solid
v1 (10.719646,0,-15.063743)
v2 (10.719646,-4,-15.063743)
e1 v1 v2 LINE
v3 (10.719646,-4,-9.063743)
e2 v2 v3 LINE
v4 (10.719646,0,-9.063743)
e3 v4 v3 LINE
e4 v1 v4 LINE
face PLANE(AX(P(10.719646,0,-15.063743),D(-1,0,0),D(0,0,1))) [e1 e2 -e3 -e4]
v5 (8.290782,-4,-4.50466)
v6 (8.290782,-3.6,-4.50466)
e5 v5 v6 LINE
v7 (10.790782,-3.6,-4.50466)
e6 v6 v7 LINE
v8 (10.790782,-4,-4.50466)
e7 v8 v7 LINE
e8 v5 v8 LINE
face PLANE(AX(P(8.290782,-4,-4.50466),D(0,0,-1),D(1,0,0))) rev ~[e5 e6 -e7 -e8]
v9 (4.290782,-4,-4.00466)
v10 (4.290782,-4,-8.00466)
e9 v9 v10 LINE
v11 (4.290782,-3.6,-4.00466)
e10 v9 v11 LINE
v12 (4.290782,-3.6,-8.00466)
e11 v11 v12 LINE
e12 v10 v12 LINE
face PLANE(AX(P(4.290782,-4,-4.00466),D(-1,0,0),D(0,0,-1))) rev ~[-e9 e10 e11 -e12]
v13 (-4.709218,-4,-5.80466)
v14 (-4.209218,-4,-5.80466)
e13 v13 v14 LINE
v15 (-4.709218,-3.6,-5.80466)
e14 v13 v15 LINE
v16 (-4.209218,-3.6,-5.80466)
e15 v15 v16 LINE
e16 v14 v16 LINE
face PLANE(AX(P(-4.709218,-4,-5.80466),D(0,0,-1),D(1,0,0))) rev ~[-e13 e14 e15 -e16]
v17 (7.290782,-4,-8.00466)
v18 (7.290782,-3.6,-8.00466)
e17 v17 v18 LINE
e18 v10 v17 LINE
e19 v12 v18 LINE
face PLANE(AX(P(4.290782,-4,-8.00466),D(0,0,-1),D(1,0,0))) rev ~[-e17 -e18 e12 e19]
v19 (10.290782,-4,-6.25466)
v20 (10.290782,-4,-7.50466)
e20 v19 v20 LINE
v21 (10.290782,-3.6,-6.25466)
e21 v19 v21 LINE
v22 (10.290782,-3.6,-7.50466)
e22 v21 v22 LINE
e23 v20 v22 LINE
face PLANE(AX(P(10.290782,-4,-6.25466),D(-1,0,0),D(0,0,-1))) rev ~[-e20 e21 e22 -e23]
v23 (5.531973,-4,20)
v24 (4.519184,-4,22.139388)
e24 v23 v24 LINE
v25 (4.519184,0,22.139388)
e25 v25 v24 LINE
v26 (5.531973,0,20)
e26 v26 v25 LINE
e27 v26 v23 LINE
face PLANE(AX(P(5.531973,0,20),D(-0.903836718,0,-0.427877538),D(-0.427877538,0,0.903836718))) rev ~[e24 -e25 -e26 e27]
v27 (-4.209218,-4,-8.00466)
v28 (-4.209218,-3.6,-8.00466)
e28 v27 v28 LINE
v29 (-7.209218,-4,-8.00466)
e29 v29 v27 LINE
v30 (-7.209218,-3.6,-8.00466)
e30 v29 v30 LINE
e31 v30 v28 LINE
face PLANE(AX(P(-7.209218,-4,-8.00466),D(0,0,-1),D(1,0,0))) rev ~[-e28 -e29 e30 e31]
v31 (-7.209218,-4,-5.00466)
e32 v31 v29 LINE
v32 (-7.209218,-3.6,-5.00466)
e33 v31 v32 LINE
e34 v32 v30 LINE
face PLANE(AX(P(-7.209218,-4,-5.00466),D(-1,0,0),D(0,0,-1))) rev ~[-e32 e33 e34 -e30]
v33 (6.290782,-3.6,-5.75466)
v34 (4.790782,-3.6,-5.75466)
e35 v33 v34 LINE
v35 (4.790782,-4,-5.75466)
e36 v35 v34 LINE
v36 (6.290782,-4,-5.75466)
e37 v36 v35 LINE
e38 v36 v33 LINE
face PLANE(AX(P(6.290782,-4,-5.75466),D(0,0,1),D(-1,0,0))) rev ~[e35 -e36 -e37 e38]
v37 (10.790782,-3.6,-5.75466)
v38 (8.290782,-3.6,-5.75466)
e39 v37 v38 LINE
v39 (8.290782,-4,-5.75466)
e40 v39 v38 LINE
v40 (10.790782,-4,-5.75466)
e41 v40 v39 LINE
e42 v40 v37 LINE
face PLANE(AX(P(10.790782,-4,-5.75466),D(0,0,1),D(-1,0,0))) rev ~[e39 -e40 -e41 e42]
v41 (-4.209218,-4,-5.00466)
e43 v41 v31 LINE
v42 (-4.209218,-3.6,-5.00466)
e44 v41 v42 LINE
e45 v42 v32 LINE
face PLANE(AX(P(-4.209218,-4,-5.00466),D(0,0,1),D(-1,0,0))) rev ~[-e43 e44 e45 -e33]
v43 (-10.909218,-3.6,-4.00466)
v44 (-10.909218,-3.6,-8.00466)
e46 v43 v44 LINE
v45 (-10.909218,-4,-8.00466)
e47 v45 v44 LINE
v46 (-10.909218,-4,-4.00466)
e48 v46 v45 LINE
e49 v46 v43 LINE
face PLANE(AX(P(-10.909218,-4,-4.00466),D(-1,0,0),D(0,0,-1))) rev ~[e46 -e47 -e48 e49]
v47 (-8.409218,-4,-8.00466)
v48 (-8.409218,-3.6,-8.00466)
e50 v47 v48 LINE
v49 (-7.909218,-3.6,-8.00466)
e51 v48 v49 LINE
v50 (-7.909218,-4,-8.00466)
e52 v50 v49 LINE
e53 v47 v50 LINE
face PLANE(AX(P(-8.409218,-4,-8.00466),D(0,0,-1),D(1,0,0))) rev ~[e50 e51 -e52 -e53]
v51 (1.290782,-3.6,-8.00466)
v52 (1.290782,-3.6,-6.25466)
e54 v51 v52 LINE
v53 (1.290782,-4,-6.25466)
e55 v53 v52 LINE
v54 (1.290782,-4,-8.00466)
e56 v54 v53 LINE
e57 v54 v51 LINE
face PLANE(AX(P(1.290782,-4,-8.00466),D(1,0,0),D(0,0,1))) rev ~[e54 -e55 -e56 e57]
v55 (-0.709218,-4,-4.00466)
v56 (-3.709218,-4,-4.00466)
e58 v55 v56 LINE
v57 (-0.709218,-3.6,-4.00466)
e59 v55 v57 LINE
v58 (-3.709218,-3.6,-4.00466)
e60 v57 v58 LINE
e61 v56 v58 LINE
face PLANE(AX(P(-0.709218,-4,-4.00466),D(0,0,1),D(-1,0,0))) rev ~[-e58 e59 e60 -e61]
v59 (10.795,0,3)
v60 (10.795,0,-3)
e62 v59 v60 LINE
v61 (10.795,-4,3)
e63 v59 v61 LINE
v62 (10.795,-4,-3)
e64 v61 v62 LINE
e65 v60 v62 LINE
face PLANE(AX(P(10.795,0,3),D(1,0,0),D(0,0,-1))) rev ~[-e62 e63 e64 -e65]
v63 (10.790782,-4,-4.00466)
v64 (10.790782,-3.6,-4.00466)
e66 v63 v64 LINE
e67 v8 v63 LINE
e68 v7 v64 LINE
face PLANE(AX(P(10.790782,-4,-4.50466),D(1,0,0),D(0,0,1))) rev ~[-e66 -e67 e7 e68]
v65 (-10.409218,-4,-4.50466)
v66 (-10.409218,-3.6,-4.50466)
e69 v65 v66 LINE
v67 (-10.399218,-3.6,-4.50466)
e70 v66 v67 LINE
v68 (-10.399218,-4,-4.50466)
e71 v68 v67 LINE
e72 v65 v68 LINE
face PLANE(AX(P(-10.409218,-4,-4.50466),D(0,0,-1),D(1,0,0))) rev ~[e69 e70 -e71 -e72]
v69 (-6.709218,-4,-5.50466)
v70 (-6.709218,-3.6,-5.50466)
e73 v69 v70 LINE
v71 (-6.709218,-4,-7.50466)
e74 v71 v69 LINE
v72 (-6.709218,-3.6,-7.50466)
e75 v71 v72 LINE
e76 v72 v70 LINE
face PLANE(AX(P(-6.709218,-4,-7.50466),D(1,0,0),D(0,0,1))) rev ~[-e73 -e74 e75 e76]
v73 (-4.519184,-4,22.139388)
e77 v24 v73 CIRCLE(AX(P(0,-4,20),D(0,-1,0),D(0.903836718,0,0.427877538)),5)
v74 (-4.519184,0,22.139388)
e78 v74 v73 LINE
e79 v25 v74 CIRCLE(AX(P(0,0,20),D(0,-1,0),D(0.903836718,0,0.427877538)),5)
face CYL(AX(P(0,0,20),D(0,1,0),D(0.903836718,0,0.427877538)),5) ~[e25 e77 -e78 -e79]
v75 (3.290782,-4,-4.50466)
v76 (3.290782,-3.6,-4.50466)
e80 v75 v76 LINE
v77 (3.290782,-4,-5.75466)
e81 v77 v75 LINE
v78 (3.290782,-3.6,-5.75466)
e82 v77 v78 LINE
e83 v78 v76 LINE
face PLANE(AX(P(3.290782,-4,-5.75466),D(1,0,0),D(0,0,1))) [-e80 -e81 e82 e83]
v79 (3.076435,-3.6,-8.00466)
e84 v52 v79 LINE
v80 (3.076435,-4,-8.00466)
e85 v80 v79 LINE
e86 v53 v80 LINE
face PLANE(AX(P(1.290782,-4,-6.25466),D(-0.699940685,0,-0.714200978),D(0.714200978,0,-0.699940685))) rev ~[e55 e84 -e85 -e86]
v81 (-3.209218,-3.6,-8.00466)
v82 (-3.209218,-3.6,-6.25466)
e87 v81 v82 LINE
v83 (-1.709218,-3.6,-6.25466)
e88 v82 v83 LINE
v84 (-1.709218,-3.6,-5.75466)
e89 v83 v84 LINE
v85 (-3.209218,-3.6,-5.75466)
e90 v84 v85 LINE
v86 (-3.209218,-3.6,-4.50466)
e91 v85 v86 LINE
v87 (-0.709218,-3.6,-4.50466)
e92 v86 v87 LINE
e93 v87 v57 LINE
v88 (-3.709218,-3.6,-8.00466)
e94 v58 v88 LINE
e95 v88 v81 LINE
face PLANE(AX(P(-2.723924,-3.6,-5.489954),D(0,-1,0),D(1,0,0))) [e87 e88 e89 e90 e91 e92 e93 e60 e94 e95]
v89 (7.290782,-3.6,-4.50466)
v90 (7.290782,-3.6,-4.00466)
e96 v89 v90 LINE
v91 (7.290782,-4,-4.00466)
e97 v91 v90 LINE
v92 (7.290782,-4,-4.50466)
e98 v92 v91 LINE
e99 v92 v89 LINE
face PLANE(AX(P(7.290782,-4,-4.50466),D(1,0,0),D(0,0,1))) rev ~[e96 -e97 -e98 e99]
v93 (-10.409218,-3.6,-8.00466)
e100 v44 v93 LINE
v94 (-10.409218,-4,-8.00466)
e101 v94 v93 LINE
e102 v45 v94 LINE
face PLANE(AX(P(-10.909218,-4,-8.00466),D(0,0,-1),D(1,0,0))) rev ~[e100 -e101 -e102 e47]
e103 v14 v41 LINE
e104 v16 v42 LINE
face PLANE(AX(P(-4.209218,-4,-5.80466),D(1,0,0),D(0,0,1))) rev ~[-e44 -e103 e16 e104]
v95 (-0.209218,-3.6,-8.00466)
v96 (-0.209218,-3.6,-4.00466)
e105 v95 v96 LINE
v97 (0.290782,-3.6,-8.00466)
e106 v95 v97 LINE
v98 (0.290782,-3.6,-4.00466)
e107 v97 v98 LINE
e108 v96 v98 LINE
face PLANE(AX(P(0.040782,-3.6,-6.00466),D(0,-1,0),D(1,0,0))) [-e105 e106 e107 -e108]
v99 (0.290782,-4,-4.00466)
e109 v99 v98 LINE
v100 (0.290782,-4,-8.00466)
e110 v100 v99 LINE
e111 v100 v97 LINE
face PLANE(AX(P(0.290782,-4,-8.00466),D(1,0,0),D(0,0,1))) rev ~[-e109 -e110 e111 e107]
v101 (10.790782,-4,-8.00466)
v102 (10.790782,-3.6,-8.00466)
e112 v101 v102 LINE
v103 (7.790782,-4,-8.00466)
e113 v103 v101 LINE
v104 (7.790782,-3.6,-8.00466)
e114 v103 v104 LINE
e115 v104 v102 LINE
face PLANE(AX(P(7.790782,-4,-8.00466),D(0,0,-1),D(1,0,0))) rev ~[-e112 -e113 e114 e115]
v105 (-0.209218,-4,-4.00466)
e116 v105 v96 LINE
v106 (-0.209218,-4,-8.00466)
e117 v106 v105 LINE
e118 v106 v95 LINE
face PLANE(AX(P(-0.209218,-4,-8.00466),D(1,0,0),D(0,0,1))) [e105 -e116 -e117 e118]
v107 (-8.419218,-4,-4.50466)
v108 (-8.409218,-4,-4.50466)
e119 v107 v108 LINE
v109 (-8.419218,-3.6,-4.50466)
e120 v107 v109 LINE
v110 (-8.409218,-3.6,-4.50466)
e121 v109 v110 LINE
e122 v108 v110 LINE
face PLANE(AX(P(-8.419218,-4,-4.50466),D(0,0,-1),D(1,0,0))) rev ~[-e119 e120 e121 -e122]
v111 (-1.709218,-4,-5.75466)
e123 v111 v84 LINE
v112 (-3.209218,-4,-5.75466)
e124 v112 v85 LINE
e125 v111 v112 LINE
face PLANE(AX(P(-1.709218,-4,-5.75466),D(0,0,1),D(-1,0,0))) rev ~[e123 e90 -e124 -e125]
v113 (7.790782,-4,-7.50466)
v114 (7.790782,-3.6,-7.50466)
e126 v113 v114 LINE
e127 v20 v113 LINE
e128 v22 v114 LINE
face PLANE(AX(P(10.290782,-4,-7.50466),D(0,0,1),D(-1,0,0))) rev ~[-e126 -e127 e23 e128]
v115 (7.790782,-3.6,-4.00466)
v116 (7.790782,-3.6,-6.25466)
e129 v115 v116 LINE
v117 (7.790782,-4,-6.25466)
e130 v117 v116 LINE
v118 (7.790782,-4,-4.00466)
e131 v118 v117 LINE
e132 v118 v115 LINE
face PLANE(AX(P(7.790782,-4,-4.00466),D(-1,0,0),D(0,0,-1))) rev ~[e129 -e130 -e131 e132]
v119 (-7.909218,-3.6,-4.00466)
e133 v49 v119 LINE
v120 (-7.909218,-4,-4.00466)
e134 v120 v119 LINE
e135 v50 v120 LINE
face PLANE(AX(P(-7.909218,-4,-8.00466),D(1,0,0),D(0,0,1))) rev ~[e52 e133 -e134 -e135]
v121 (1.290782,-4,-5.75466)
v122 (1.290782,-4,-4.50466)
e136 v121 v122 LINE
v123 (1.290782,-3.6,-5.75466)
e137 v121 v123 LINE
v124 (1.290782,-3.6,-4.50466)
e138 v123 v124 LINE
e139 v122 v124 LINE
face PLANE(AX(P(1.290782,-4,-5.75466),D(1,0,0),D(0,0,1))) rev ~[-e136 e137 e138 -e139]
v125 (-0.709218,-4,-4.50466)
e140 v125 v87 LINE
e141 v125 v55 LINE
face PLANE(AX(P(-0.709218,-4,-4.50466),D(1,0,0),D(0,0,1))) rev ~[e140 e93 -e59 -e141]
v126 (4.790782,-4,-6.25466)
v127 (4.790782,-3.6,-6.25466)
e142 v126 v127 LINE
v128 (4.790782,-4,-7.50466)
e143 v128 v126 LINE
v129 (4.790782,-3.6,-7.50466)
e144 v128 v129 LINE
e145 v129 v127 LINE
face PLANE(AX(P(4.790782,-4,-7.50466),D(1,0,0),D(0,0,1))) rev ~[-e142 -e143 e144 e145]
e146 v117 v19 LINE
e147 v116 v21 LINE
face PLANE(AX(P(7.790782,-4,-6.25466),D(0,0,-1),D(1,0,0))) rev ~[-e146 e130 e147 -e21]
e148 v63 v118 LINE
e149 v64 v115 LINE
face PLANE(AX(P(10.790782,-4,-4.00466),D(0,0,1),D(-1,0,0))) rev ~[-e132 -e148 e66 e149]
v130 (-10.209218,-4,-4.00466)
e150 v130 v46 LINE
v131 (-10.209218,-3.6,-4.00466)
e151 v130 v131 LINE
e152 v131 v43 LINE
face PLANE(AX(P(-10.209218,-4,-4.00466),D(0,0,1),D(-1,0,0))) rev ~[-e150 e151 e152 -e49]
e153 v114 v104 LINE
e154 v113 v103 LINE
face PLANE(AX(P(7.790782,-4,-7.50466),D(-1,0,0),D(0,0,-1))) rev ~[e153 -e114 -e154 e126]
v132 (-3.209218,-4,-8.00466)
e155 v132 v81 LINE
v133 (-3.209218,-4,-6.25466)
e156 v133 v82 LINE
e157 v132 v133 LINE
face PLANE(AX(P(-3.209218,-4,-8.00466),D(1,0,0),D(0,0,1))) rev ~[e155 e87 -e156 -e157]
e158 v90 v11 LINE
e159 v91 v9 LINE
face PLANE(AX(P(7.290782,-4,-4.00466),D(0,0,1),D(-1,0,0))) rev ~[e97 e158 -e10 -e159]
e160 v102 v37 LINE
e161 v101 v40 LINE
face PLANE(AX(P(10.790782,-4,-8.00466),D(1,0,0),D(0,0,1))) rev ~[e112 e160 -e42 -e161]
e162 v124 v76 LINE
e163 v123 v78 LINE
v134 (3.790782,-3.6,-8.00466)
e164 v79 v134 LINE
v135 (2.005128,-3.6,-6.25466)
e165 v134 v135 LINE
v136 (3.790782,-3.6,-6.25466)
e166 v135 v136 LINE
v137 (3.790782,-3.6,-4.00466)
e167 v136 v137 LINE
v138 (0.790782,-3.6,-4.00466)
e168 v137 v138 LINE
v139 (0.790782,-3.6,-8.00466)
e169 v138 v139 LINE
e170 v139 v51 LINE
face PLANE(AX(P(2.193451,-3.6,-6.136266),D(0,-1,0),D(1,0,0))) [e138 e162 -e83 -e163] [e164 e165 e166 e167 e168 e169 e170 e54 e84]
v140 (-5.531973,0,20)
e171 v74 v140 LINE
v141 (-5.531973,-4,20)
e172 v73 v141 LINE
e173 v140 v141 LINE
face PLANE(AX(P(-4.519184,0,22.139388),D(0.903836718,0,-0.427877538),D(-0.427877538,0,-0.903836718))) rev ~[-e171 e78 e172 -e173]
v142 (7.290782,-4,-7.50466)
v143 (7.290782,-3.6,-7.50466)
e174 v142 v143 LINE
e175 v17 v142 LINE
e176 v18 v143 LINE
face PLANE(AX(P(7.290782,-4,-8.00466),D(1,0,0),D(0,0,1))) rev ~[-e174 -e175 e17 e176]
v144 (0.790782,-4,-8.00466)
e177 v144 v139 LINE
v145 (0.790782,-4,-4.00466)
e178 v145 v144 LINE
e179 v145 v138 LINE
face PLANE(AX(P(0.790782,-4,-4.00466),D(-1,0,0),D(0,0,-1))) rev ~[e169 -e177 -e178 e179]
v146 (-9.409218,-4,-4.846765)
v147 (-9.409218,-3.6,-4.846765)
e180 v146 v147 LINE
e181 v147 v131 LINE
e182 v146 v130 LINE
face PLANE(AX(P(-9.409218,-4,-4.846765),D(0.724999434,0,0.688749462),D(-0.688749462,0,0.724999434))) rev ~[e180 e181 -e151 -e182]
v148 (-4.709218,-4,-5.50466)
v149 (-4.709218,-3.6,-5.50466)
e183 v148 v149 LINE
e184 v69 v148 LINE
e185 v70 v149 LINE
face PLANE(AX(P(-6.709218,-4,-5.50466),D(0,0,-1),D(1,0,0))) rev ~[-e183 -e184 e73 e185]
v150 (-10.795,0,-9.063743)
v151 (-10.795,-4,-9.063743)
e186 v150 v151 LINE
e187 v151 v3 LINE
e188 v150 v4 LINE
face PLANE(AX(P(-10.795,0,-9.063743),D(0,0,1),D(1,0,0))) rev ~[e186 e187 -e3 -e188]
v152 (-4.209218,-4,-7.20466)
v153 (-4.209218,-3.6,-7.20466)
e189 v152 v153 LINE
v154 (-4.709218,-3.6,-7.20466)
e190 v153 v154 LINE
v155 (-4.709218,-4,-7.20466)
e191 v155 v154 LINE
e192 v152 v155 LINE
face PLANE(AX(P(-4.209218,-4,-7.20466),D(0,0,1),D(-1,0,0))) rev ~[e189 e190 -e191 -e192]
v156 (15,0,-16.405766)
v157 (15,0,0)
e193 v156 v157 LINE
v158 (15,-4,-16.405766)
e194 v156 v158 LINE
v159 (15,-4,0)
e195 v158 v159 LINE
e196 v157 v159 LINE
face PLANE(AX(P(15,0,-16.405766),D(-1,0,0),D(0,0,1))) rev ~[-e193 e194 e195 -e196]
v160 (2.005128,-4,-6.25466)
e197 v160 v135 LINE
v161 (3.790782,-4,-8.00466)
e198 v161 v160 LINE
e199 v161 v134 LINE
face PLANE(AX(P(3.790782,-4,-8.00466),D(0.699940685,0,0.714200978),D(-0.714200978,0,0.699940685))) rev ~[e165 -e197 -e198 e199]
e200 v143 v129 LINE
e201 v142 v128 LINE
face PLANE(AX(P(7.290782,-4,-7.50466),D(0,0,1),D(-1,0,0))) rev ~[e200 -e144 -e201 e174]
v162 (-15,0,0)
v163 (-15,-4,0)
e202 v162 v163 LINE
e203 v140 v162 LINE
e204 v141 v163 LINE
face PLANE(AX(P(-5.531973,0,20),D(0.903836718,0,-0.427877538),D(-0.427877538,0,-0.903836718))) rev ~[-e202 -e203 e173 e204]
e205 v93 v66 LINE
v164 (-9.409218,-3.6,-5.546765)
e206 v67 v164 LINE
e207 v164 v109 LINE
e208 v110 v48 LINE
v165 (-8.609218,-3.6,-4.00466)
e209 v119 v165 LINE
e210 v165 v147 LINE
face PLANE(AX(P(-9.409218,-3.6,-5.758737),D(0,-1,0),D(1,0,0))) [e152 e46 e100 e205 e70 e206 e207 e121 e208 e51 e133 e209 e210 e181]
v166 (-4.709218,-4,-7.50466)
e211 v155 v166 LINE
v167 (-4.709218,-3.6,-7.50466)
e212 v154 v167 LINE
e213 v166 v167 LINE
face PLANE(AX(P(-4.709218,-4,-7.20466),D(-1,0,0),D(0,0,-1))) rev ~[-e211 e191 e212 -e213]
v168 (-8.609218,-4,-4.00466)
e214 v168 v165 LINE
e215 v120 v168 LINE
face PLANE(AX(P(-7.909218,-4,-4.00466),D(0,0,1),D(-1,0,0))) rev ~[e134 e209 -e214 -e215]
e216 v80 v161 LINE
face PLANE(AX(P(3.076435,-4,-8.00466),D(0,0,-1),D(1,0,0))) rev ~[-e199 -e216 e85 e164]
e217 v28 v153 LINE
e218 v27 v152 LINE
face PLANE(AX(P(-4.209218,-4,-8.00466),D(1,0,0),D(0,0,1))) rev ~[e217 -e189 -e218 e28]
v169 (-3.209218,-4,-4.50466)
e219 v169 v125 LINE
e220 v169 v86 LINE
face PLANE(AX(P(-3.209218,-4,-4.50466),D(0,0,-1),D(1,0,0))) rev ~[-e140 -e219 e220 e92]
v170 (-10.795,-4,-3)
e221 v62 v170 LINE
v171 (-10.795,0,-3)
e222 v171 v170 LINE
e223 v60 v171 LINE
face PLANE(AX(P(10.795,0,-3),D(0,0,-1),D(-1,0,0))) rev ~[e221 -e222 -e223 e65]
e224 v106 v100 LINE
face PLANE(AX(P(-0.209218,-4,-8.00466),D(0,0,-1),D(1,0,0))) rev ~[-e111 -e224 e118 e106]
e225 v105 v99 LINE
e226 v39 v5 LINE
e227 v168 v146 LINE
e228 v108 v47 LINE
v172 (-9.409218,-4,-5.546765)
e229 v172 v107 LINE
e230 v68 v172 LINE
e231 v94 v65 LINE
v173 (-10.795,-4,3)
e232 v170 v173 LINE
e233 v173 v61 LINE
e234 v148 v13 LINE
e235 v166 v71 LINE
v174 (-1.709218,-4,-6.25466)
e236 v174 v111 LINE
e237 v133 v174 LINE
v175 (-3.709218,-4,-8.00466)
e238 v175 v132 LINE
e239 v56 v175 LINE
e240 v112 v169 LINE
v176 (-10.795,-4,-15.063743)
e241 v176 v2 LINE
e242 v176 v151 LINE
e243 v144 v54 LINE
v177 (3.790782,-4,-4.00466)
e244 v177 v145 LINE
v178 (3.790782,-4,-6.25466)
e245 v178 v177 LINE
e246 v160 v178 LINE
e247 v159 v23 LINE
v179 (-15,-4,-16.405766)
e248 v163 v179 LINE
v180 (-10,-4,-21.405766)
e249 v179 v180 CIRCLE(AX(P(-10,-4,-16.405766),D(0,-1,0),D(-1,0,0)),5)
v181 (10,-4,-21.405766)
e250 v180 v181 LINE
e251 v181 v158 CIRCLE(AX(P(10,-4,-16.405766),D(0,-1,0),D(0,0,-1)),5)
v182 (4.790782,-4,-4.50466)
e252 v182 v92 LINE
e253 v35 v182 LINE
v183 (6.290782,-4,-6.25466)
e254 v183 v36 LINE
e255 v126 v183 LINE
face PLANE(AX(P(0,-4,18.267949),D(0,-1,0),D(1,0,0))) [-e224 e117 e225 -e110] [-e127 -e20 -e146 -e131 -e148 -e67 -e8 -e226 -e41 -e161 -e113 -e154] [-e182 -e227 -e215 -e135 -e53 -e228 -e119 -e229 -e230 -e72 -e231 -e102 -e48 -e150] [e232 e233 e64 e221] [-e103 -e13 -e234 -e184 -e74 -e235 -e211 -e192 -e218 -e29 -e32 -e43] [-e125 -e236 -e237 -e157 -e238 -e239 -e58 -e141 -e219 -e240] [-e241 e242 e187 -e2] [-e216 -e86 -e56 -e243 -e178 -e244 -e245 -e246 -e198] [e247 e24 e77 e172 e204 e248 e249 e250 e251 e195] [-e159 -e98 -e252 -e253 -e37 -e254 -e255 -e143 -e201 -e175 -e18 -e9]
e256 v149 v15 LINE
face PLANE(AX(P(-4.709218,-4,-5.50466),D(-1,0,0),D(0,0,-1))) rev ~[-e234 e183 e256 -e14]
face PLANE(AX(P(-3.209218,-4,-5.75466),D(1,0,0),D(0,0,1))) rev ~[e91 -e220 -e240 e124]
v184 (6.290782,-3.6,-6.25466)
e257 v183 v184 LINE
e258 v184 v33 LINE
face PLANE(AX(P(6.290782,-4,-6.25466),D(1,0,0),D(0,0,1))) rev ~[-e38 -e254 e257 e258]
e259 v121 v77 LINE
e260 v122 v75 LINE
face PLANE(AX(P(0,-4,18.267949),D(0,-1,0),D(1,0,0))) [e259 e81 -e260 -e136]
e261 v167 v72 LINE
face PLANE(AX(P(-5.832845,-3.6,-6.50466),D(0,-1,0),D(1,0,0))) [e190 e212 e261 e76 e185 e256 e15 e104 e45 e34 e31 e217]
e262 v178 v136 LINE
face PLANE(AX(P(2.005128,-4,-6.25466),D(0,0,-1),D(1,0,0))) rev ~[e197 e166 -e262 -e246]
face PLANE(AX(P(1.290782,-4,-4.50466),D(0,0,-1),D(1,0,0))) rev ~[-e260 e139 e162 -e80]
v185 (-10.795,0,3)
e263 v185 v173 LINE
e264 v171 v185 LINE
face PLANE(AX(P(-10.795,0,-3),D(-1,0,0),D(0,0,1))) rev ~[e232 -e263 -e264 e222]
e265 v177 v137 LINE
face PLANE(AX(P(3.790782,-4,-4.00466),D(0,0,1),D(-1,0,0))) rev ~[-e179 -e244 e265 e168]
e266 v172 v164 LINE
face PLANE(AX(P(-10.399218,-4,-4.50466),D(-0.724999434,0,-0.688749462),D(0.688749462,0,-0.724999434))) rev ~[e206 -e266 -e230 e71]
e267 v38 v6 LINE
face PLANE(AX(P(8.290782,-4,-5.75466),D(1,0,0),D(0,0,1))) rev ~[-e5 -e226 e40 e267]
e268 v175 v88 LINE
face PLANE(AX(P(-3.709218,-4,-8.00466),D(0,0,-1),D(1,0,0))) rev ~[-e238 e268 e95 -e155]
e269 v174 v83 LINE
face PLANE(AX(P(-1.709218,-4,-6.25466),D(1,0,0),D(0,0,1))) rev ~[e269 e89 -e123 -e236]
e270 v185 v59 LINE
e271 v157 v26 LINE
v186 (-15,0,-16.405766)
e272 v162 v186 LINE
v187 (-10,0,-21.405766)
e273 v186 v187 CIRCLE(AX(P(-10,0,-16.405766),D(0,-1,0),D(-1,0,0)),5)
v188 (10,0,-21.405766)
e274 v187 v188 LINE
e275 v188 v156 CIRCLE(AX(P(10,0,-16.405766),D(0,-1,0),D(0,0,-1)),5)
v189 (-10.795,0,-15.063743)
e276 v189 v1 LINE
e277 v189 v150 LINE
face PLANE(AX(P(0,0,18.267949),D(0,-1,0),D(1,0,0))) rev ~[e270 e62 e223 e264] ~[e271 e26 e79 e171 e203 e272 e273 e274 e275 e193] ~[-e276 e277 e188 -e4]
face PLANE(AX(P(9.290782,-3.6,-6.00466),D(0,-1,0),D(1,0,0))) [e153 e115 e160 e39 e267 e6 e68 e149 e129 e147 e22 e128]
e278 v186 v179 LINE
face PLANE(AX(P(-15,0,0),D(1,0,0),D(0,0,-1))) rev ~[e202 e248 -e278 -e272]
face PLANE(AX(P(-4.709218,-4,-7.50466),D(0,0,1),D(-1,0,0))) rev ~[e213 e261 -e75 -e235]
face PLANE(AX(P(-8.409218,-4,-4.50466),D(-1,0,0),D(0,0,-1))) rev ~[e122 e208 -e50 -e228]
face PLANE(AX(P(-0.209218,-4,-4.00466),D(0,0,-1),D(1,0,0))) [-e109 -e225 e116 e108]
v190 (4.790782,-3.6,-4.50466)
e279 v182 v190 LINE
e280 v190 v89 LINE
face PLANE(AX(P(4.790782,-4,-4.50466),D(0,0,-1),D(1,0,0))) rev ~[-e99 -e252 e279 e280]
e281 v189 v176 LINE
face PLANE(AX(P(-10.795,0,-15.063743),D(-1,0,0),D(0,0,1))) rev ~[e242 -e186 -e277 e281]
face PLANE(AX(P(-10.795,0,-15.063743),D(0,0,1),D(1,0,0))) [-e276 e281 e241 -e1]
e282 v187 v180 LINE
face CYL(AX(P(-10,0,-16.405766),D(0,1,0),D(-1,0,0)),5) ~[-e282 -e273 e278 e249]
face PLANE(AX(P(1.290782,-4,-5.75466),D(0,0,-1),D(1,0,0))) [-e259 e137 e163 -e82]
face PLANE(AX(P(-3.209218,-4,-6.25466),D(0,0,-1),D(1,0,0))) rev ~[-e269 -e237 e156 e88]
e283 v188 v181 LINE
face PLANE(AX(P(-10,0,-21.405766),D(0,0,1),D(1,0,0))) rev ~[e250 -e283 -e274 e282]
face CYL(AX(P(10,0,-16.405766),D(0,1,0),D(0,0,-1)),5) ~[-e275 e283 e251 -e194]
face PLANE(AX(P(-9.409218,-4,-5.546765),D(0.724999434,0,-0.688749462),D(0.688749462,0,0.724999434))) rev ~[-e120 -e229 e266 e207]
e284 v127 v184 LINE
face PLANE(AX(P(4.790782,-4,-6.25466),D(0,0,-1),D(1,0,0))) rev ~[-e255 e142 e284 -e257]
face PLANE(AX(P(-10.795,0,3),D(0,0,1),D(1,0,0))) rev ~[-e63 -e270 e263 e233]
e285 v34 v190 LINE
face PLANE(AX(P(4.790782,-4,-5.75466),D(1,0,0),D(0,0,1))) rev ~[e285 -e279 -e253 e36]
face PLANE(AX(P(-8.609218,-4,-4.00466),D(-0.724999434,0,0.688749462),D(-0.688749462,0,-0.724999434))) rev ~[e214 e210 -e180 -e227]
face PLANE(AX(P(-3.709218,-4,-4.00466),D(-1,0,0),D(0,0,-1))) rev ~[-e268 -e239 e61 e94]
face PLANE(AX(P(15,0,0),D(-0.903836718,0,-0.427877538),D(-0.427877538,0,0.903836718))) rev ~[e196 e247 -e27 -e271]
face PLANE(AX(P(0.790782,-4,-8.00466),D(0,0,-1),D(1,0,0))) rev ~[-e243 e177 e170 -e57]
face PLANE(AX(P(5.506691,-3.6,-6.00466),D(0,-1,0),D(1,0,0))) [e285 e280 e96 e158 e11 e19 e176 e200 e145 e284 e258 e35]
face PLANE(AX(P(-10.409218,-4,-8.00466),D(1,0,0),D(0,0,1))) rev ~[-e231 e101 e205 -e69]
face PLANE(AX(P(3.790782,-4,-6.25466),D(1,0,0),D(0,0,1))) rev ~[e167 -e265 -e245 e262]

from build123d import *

# Parameters (mm, degrees)
F0_W     = 21.5146457776
F0_H     = 6
F1_DEPTH = 4
F2_W     = 0.5
F2_H     = 4
F2_W_2   = 2
F2_H_2   = 1.25
F3_DEPTH = 0.4


# Not quite as in the source:
# - a feature names something its author has since deleted; it is built from what else it names


with BuildPart() as f1:
    # F0 (on Front) → F1 (new body)
    with BuildSketch(Plane.XZ):
        with BuildLine():
            ThreePointArc((-5, 20), (0, 15), (5, 20))
            Line((5, 20), (-5, 20))
        make_face()
        with BuildLine():
            Line((-5, 20), (5, 20))
            ThreePointArc((5, 20), (4.8783151775, 21.0963763172), (4.5191835885, 22.1393876913))
            ThreePointArc((4.5191835885, 22.1393876913), (0, 25), (-4.5191835885, 22.1393876913))
            ThreePointArc((-4.5191835885, 22.1393876913), (-4.8783151775, 21.0963763172), (-5, 20))
        make_face()
        with BuildLine():
            Line((5.5319726474, 20), (5, 20))
            ThreePointArc((5, 20), (0, 15), (-5, 20))
            Line((-5, 20), (-5.5319726474, 20))
            Line((-5.5319726474, 20), (-15, 0))
            Line((-15, 0), (-10.795, 0))
            Line((-10.795, 0), (-10.795, 3))
            Line((-10.795, 3), (10.795, 3))
            Line((10.795, 3), (10.795, 0))
            Line((10.795, 0), (15, 0))
            Line((15, 0), (5.5319726474, 20))
        make_face()
        with BuildLine():
            Line((15, -16.4057657868), (15, 0))
            Line((15, 0), (10.795, 0))
            Line((10.795, 0), (10.795, -3))
            Line((10.795, -3), (-10.795, -3))
            Line((-10.795, -3), (-10.795, 0))
            Line((-10.795, 0), (-15, 0))
            Line((-15, 0), (-15, -16.4057657868))
            ThreePointArc((-15, -16.4057657868), (-13.5355339059, -19.9412996927), (-10, -21.4057657868))
            Line((-10, -21.4057657868), (10, -21.4057657868))
            ThreePointArc((10, -21.4057657868), (13.5355339059, -19.9412996927), (15, -16.4057657868))
        make_face()
        with Locations((-0.0376771112, -12.0637425241)):
            Rectangle(F0_W, F0_H, mode=Mode.SUBTRACT)
        with BuildLine():
            Line((-5.5319726474, 20), (-5, 20))
            ThreePointArc((-5, 20), (-4.8783151775, 21.0963763172), (-4.5191835885, 22.1393876913))
            Line((-4.5191835885, 22.1393876913), (-5.5319726474, 20))
        make_face()
        with BuildLine():
            ThreePointArc((4.5191835885, 22.1393876913), (4.8783151775, 21.0963763172), (5, 20))
            Line((5, 20), (5.5319726474, 20))
            Line((5.5319726474, 20), (4.5191835885, 22.1393876913))
        make_face()
    extrude(amount=F1_DEPTH)

    # F2 (on face) → F3 (cut)
    with BuildSketch(Plane.XZ.offset(4)):
        Polygon((-10.4092183411, -4.0046597868), (-10.9092183411, -4.0046597868), (-10.9092183411, -8.0046597868), (-10.4092183411, -8.0046597868), (-10.4092183411, -4.5046597868), (-10.3992183411, -4.5046597868), (-9.4092183411, -5.54676505), (-8.4192183411, -4.5046597868), (-8.4092183411, -4.5046597868), (-8.4092183411, -8.0046597868), (-7.9092183411, -8.0046597868), (-7.9092183411, -4.0046597868), (-8.4092183411, -4.0046597868), (-8.6092183411, -4.0046597868), (-9.4092183411, -4.84676505), (-10.2092183411, -4.0046597868), align=None)
        Polygon((-4.2092183411, -5.0046597868), (-7.2092183411, -5.0046597868), (-7.2092183411, -8.0046597868), (-4.2092183411, -8.0046597868), (-4.2092183411, -7.2046597868), (-4.7092183411, -7.2046597868), (-4.7092183411, -7.5046597868), (-6.7092183411, -7.5046597868), (-6.7092183411, -5.5046597868), (-4.7092183411, -5.5046597868), (-4.7092183411, -5.8046597868), (-4.2092183411, -5.8046597868), align=None)
        Polygon((-0.7092183411, -4.0046597868), (-3.7092183411, -4.0046597868), (-3.7092183411, -8.0046597868), (-3.2092183411, -8.0046597868), (-3.2092183411, -6.2546597868), (-1.7092183411, -6.2546597868), (-1.7092183411, -5.7546597868), (-3.2092183411, -5.7546597868), (-3.2092183411, -4.5046597868), (-0.7092183411, -4.5046597868), align=None)
        with Locations((0.0407816589, -6.0046597868)):
            Rectangle(F2_W, F2_H)
        Polygon((3.7907816589, -4.0046597868), (0.7907816589, -4.0046597868), (0.7907816589, -8.0046597868), (1.2907816589, -8.0046597868), (1.2907816589, -6.2546597868), (3.0764354139, -8.0046597868), (3.7907816589, -8.0046597868), (2.0051279039, -6.2546597868), (3.7907816589, -6.2546597868), align=None)
        with Locations((2.2907816589, -5.1296597868)):
            Rectangle(F2_W_2, F2_H_2, mode=Mode.SUBTRACT)
        Polygon((7.2907816589, -4.0046597868), (4.2907816589, -4.0046597868), (4.2907816589, -8.0046597868), (7.2907816589, -8.0046597868), (7.2907816589, -7.5046597868), (4.7907816589, -7.5046597868), (4.7907816589, -6.2546597868), (6.2907816589, -6.2546597868), (6.2907816589, -5.7546597868), (4.7907816589, -5.7546597868), (4.7907816589, -4.5046597868), (7.2907816589, -4.5046597868), align=None)
        Polygon((10.7907816589, -4.0046597868), (7.7907816589, -4.0046597868), (7.7907816589, -6.2546597868), (10.2907816589, -6.2546597868), (10.2907816589, -7.5046597868), (7.7907816589, -7.5046597868), (7.7907816589, -8.0046597868), (10.7907816589, -8.0046597868), (10.7907816589, -5.7546597868), (8.2907816589, -5.7546597868), (8.2907816589, -4.5046597868), (10.7907816589, -4.5046597868), align=None)
    extrude(amount=-F3_DEPTH, mode=Mode.SUBTRACT)


solid = f1.part
